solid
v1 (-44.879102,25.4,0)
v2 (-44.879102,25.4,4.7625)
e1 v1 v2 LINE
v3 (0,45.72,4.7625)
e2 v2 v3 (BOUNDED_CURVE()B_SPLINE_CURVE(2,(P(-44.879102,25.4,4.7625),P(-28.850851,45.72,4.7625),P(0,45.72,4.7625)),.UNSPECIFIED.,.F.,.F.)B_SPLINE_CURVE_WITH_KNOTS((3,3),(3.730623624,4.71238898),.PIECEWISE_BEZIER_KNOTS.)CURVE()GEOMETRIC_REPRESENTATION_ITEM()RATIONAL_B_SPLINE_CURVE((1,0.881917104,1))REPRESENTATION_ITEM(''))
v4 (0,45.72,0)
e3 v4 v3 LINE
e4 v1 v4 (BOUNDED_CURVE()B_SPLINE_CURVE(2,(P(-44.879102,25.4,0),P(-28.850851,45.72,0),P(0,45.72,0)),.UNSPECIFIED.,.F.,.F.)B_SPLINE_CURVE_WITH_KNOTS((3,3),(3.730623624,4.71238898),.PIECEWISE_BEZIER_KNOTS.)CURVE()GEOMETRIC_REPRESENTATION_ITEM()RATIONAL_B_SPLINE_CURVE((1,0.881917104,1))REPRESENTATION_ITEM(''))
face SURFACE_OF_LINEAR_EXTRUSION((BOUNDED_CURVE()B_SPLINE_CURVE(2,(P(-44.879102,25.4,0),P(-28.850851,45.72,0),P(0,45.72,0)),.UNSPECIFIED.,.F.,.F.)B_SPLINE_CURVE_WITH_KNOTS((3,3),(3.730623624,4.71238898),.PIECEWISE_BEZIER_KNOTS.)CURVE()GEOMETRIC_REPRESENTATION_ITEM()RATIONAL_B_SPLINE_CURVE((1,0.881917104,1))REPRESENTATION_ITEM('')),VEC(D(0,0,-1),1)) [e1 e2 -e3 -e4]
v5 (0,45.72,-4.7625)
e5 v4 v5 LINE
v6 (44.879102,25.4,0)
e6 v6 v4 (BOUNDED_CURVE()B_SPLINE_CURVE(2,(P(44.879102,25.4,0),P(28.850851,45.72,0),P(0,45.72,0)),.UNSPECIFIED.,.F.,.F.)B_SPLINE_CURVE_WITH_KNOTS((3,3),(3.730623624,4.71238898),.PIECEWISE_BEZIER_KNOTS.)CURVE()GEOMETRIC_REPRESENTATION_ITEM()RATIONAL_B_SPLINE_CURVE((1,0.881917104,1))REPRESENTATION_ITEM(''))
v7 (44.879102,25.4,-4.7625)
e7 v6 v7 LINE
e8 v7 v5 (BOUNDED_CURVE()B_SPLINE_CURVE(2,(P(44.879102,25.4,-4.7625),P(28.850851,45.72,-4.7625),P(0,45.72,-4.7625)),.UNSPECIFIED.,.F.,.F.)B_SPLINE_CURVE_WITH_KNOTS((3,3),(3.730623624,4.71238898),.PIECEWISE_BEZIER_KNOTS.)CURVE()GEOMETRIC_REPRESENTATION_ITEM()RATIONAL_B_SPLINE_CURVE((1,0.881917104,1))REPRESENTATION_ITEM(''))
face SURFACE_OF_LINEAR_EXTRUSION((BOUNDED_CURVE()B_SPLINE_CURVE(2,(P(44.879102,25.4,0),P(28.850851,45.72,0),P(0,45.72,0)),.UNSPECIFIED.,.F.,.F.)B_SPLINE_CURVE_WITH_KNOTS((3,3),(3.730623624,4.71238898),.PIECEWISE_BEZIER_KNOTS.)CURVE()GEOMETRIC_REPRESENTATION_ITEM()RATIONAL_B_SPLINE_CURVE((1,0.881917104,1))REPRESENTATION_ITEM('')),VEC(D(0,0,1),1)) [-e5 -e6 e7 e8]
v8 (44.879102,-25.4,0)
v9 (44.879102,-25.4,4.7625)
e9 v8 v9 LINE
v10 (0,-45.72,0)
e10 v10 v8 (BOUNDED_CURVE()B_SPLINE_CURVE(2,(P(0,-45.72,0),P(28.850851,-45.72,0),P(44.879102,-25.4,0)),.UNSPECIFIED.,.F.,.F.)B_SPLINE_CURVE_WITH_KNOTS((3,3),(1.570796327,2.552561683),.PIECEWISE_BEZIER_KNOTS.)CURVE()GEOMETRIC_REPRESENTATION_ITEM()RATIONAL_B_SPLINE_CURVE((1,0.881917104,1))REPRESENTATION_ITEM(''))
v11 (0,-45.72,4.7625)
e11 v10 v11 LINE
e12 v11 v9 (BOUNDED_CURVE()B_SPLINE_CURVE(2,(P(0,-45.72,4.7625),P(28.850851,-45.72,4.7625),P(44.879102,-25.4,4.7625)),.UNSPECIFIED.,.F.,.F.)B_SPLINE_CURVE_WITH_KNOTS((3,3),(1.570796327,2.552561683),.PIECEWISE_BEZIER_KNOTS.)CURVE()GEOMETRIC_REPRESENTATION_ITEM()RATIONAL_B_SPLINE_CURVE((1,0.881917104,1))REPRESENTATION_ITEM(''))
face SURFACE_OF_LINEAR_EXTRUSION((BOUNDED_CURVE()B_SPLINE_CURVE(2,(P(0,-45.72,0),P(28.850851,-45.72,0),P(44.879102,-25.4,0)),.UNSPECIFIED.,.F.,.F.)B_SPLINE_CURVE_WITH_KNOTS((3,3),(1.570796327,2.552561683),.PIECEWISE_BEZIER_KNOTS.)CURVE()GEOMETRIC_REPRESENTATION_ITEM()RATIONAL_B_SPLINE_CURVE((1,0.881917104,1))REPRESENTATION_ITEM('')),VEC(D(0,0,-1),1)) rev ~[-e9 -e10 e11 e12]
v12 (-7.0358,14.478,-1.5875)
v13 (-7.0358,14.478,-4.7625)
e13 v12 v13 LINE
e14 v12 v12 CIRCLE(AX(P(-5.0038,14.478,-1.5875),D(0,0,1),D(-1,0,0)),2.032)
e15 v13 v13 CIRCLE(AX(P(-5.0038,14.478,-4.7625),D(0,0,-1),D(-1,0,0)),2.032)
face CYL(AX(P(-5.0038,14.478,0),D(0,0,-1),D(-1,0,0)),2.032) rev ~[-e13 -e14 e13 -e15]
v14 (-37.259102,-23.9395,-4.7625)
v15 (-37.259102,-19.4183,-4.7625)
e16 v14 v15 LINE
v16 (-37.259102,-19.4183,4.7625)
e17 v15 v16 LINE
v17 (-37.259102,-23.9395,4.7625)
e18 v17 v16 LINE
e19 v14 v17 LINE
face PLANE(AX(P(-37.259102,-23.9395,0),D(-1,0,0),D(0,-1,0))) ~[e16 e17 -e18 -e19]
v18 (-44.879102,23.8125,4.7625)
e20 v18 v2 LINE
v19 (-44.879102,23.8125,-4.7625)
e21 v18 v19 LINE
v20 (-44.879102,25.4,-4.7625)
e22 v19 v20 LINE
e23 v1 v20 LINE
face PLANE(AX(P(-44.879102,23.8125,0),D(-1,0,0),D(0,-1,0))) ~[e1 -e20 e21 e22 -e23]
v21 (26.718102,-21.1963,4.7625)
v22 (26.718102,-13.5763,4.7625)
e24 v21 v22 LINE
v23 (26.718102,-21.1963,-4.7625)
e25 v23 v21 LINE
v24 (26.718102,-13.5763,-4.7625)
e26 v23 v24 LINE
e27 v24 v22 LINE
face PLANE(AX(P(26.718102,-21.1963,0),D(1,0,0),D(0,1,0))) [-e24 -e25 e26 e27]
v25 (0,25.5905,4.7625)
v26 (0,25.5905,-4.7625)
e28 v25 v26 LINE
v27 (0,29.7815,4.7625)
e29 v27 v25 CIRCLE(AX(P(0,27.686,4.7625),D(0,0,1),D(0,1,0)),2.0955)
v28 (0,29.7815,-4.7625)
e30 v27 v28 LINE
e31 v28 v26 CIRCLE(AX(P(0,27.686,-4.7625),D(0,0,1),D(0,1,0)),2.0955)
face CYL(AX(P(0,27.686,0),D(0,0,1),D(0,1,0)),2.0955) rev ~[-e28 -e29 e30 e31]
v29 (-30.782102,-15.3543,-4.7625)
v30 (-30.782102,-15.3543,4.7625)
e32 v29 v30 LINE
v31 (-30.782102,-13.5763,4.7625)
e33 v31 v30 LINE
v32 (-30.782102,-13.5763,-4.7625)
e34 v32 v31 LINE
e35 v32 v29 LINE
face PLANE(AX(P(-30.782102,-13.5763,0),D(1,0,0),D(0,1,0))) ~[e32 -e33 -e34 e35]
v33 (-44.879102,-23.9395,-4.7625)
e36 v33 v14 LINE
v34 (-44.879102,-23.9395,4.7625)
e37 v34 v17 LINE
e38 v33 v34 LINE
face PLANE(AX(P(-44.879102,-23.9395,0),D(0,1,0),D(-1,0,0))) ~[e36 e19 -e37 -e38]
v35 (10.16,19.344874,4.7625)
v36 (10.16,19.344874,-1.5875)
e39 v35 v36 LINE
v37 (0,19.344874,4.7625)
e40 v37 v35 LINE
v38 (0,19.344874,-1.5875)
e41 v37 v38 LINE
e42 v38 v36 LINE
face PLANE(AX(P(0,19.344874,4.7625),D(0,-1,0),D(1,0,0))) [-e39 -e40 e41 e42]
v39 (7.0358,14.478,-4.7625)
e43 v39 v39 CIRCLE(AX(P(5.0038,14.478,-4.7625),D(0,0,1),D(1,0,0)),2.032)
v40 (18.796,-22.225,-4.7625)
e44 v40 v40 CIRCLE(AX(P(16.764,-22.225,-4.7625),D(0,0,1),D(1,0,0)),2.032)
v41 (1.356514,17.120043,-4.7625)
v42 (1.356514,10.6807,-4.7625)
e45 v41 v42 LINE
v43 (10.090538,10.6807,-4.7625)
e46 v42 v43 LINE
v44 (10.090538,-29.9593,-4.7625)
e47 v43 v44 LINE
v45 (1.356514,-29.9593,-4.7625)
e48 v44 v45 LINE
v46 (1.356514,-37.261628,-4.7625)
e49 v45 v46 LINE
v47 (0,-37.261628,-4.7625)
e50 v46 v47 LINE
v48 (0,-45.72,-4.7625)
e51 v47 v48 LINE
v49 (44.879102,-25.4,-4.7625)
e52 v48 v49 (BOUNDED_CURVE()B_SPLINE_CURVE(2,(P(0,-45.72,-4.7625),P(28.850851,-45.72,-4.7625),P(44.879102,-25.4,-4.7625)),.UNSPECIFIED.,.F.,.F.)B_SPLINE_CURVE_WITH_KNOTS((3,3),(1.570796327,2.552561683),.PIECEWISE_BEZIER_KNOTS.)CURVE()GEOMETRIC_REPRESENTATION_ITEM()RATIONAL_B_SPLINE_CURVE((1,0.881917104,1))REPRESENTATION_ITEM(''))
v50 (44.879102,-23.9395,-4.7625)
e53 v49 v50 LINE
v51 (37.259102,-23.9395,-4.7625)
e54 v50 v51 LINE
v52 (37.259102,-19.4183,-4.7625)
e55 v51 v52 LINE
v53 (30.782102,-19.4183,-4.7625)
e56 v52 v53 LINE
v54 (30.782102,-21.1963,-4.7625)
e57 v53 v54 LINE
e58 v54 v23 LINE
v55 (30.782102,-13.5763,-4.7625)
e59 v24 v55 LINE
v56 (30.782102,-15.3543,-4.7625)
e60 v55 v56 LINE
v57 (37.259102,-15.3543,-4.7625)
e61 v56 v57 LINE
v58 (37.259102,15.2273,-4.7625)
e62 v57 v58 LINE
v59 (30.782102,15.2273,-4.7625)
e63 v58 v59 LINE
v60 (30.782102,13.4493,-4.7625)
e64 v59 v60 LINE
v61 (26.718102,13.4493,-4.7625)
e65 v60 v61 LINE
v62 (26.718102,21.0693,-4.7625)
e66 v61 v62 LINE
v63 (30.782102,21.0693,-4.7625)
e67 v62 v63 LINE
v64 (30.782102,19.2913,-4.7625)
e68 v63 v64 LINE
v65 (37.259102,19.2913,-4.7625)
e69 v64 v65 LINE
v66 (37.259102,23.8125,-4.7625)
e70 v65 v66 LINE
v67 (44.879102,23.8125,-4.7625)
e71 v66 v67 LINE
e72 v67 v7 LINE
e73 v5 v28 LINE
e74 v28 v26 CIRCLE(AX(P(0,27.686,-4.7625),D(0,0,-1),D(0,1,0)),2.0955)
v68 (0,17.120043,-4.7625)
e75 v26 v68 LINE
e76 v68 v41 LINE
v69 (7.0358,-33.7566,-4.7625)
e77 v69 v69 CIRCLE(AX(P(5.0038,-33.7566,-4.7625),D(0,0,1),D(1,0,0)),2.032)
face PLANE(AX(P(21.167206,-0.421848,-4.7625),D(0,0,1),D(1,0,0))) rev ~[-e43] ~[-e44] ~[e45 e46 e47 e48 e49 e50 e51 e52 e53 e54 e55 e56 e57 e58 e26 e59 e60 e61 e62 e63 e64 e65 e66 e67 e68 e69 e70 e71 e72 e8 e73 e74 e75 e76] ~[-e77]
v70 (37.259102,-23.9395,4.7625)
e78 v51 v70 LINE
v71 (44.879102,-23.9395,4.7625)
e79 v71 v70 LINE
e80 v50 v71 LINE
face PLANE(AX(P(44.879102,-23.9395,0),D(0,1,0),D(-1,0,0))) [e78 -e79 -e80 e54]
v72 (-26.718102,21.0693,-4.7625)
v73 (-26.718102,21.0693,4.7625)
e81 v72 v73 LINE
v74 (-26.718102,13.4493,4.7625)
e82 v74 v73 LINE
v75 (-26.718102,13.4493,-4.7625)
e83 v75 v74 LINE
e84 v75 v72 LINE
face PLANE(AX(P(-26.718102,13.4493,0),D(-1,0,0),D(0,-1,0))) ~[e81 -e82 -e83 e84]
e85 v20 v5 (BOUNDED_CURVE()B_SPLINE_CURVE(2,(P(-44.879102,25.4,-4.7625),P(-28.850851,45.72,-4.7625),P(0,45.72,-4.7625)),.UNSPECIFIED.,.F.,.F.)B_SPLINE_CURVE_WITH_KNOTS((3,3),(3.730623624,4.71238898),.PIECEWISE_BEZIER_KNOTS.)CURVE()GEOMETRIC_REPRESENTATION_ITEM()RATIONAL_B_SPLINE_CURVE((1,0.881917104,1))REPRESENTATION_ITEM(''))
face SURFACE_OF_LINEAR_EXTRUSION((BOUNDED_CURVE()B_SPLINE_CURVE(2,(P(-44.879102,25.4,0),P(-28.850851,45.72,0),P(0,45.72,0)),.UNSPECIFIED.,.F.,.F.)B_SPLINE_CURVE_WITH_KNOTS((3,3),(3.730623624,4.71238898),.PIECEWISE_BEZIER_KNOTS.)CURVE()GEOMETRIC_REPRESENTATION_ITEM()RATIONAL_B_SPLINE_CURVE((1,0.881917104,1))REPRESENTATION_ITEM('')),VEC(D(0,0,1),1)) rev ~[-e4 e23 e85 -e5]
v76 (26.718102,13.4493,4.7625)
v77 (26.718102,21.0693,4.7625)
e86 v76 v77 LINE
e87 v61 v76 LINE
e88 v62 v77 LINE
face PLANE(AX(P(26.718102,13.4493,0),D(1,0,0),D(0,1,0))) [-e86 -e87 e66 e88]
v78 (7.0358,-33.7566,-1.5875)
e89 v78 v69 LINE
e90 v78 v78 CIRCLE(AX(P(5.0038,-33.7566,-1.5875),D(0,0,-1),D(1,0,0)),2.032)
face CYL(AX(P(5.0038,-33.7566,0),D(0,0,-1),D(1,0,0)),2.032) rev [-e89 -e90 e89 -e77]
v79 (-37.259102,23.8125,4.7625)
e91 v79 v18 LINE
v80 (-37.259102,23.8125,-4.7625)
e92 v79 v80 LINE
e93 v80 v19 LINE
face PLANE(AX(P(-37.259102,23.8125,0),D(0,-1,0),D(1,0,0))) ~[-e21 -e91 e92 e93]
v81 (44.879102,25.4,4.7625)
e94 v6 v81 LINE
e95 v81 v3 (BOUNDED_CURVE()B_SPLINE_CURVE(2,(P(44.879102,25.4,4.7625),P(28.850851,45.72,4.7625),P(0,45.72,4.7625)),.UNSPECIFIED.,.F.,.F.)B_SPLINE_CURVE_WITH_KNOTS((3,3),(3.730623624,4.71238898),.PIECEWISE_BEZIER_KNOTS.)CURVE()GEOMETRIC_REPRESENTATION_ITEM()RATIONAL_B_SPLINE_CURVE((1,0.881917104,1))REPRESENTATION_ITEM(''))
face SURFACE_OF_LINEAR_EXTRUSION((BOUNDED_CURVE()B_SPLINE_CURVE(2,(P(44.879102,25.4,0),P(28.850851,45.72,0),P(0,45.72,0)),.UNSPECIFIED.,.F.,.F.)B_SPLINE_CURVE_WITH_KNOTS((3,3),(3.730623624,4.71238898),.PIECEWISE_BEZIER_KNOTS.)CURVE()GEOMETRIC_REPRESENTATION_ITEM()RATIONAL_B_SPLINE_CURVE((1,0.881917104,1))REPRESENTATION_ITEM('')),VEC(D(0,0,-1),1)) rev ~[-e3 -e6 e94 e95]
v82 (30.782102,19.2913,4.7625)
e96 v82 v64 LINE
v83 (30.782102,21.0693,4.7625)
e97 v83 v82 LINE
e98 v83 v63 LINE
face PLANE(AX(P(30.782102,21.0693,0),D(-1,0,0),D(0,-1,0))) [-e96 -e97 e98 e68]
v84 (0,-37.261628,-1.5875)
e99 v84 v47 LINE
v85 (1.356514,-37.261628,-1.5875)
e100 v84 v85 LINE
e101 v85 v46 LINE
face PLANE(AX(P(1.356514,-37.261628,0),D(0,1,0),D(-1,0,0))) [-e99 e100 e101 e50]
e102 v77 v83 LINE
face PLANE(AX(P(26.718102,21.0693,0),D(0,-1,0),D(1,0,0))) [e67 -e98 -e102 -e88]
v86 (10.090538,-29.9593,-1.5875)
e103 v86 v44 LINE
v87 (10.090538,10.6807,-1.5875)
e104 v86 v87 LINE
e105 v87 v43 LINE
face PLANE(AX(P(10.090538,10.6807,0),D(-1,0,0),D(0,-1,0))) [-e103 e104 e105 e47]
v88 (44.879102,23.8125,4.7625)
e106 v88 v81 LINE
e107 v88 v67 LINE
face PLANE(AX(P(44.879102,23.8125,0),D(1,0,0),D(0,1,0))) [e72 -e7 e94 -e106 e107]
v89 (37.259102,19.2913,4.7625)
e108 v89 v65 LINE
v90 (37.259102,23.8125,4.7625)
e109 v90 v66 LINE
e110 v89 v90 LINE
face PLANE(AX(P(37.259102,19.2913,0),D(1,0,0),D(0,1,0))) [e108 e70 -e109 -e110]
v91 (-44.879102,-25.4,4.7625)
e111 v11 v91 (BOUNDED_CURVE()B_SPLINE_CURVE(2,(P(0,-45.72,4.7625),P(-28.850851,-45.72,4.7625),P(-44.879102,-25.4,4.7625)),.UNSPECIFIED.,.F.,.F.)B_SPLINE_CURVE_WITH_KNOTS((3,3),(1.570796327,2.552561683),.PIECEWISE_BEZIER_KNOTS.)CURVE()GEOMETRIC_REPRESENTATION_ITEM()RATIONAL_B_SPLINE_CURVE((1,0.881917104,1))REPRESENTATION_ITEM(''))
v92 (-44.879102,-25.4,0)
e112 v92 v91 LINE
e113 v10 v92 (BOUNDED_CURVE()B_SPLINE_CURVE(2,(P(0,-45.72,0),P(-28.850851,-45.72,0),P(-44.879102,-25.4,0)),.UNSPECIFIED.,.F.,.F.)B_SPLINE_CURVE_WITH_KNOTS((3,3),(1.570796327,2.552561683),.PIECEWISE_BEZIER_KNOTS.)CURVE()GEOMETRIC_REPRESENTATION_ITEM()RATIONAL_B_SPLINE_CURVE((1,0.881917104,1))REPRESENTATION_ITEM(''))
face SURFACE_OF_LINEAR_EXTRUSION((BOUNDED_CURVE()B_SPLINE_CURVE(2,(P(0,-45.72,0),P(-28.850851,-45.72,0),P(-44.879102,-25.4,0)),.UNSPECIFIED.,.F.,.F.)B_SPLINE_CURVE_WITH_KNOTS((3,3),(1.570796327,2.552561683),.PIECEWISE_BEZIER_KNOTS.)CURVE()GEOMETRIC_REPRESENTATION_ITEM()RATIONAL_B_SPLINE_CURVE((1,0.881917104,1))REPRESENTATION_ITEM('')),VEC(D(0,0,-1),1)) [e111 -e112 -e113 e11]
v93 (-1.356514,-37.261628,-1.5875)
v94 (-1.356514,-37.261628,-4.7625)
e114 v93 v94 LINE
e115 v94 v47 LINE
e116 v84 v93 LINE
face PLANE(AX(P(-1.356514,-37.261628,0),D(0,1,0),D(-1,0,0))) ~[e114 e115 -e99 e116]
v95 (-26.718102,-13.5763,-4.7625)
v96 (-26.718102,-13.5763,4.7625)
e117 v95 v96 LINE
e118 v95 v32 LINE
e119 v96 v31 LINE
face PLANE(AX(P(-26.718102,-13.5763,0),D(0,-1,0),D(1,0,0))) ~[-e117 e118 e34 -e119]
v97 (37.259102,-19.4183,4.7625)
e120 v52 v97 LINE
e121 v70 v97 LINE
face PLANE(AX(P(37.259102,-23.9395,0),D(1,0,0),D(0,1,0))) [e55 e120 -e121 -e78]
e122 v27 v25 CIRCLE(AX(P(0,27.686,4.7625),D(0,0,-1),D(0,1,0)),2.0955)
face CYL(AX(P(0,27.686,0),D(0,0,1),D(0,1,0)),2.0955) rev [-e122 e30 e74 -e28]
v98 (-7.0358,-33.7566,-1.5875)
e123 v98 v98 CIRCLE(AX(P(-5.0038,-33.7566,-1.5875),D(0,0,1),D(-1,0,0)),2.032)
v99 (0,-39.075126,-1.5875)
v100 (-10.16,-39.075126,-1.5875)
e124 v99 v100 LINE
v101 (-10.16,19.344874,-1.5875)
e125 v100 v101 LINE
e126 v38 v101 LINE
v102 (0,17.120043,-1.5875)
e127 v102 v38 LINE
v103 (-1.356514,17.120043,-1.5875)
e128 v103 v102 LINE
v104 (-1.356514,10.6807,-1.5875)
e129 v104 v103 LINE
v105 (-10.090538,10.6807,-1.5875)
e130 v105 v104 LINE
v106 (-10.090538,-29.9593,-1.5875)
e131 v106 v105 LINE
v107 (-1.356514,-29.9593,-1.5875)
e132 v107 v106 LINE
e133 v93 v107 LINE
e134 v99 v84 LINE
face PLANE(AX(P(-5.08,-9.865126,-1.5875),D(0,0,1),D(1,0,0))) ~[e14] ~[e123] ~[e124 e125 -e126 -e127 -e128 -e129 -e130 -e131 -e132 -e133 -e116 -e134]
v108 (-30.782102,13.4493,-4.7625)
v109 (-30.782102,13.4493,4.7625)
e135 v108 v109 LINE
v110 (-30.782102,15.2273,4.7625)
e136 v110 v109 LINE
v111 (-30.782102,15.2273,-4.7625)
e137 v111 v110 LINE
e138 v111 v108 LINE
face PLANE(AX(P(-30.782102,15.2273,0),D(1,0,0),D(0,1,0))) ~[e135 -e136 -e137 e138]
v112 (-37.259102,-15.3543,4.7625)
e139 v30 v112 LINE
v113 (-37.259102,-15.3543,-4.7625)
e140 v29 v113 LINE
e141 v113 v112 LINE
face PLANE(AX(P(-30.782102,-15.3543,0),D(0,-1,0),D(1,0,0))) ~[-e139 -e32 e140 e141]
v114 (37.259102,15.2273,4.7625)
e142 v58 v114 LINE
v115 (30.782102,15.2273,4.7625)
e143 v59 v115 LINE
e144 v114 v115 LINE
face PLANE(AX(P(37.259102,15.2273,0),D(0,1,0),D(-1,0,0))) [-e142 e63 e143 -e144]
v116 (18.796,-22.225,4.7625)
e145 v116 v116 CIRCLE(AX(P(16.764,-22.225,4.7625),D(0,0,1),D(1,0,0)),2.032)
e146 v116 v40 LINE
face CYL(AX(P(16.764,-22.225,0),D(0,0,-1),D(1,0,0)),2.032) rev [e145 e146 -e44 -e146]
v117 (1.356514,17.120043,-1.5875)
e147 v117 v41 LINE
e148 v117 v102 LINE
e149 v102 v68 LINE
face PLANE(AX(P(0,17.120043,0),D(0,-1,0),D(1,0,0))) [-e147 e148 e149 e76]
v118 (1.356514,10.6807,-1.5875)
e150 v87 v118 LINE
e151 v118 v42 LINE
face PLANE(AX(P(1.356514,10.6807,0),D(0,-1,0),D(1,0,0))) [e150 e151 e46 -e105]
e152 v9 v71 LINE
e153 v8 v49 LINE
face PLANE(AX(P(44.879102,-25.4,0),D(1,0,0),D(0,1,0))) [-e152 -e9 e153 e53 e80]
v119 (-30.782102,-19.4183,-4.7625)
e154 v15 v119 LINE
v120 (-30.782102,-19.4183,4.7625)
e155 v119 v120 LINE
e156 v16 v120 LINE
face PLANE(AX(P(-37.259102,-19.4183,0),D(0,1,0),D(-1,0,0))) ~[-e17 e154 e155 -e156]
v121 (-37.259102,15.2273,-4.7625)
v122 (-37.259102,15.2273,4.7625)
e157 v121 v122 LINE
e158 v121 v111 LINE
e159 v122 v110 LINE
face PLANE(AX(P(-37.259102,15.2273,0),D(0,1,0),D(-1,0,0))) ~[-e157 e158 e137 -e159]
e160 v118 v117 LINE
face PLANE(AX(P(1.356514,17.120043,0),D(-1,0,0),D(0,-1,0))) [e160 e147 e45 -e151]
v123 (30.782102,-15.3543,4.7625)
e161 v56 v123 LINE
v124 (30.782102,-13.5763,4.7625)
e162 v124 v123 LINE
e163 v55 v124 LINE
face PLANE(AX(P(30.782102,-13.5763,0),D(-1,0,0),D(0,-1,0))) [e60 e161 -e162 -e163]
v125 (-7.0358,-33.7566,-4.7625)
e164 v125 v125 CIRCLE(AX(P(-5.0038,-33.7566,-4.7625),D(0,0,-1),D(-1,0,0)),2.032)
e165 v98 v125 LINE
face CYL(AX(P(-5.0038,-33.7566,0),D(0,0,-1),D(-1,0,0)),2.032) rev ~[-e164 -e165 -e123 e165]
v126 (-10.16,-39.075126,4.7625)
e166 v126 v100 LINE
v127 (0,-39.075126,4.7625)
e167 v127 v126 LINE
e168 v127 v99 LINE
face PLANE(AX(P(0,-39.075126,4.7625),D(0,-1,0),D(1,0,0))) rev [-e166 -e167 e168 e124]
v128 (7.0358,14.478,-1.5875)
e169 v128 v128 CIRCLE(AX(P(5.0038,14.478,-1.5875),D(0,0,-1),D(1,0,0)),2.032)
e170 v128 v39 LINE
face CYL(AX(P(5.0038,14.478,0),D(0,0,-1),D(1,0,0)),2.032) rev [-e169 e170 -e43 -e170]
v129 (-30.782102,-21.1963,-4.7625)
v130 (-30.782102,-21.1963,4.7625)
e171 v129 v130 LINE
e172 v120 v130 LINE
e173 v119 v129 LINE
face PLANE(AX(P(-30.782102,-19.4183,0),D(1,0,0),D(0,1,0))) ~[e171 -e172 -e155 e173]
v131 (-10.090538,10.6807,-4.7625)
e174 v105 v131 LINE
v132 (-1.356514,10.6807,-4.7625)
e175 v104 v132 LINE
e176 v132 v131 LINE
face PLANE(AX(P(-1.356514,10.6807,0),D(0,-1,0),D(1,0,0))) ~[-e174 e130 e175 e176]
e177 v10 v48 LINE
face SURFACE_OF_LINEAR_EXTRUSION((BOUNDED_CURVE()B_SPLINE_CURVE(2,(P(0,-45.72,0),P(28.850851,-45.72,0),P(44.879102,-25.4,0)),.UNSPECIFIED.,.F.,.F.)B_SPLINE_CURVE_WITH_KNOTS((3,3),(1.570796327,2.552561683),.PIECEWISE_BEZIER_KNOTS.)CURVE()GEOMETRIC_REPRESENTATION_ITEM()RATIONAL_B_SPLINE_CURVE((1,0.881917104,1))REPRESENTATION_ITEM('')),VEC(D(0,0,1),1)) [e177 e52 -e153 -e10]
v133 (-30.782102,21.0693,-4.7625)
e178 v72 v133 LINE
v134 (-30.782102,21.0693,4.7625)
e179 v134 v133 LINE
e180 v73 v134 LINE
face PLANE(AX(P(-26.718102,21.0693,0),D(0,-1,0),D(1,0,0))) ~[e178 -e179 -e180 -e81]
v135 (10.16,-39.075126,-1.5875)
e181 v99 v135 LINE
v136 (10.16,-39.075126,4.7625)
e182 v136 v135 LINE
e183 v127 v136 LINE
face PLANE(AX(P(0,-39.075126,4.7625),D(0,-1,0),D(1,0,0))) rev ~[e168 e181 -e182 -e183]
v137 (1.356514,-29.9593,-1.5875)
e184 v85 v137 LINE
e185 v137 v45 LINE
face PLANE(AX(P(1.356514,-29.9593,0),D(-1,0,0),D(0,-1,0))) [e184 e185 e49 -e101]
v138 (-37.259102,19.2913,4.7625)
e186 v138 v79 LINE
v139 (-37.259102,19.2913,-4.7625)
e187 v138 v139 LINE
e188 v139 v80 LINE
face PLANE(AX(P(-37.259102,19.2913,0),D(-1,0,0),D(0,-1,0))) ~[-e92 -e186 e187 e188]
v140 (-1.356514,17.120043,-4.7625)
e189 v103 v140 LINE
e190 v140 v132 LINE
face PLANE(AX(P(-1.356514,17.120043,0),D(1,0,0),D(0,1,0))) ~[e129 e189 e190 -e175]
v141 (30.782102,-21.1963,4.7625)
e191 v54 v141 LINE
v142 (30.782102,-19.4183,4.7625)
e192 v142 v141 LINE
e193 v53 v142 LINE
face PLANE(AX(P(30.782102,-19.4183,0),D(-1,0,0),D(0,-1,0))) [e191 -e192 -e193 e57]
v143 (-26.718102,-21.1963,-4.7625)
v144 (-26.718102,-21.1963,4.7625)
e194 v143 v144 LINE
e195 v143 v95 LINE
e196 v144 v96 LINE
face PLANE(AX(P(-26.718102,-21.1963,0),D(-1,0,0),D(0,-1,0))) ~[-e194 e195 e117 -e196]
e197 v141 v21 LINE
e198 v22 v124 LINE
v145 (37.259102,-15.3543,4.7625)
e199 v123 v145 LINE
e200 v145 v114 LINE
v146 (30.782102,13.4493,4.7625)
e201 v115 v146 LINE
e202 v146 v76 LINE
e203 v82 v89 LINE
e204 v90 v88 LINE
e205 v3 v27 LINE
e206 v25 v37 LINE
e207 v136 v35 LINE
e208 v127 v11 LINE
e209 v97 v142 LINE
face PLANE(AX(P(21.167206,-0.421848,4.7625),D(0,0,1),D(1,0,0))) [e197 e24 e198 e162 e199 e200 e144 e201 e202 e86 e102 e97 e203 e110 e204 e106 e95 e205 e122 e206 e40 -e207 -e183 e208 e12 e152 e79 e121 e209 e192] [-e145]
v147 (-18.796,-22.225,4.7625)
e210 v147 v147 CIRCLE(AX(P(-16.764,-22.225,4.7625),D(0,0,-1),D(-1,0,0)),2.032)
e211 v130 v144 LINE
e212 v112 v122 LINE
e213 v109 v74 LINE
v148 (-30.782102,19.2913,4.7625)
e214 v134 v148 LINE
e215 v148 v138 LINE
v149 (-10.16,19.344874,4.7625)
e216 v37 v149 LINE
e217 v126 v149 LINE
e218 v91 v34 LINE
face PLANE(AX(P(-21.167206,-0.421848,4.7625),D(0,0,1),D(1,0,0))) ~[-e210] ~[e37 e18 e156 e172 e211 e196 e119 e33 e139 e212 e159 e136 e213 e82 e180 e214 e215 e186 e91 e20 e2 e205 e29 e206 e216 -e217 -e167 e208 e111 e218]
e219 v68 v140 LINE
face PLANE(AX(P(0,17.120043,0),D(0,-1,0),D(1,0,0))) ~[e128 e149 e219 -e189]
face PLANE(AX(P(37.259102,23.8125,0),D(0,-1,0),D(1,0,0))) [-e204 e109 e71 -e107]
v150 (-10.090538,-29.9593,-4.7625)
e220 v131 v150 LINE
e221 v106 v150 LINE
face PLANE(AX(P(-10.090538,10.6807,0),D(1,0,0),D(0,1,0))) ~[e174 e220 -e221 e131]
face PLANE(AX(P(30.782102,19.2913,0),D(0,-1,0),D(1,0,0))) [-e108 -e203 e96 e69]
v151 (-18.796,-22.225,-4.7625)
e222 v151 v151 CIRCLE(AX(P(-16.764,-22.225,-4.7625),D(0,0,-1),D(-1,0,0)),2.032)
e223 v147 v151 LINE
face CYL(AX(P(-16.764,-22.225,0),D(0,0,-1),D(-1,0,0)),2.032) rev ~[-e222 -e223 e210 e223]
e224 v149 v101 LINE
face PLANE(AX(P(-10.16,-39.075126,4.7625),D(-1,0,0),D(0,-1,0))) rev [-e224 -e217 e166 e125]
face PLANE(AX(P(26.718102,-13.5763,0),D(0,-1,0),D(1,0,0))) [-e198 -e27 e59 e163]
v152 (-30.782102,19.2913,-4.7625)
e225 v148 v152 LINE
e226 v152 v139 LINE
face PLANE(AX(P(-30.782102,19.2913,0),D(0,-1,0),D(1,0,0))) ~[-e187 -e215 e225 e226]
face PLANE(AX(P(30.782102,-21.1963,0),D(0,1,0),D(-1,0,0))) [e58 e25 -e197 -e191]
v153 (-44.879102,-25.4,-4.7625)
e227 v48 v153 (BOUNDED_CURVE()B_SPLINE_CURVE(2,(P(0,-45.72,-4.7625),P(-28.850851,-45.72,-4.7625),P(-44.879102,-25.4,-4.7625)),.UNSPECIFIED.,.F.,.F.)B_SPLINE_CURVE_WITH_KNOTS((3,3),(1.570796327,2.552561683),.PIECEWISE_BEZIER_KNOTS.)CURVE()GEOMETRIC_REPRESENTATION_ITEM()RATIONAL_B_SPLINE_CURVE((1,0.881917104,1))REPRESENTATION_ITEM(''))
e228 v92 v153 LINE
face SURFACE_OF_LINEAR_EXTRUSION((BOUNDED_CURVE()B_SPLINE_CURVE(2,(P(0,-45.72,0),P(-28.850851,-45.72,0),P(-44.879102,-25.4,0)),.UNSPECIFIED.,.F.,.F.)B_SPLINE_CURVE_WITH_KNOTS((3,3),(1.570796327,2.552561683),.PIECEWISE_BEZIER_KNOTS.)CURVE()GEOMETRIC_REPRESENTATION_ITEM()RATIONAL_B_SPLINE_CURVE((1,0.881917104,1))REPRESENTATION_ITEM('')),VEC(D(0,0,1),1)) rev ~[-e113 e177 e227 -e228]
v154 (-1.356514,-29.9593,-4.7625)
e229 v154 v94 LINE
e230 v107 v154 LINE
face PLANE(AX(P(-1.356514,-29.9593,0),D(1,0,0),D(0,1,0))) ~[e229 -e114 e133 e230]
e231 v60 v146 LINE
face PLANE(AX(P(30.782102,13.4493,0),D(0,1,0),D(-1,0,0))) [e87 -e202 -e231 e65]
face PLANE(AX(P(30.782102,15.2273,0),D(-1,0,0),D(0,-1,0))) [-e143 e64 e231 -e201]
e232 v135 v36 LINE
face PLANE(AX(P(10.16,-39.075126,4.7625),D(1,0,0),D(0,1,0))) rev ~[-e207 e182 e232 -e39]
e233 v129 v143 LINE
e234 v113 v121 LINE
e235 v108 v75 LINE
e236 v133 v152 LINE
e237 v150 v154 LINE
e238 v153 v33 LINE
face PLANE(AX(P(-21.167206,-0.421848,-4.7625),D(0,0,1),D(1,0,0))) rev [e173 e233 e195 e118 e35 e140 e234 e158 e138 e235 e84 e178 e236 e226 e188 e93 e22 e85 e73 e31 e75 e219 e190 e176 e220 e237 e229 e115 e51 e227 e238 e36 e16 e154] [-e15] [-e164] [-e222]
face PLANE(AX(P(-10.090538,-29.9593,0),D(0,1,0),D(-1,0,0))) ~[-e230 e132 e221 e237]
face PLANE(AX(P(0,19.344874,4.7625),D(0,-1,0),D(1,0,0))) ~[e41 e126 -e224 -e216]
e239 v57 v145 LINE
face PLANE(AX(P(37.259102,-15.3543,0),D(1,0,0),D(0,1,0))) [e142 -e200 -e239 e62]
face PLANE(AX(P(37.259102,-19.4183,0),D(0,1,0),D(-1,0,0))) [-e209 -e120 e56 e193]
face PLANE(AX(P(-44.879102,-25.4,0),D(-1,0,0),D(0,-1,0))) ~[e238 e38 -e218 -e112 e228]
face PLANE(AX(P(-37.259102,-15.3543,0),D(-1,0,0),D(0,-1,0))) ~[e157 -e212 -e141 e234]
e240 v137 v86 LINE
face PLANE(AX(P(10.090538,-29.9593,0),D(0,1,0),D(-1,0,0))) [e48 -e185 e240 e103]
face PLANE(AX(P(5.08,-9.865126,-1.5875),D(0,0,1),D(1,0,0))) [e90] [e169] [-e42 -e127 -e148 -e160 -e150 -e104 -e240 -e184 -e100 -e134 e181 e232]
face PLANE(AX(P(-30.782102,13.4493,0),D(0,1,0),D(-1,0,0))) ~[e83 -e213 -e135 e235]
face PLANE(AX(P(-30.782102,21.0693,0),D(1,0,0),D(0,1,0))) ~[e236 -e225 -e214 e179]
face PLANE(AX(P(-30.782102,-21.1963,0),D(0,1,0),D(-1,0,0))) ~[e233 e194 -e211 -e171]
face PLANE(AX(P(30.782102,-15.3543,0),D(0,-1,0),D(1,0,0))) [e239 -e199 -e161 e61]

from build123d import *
from build123d import SkipClean  # not in build123d's __all__

# Parameters (mm, degrees)
F0_R     = 2.032
F1_DEPTH = 4.7625
F2_W     = 10.16
F2_H     = 58.42
F3_DEPTH = 6.35


with BuildPart() as f1:
    # F0 (on Top) → F1 (new body, symmetric)
    with BuildSketch(Plane.XY):
        with BuildLine():
            Line((0, -37.2616276145), (0, -45.72))
            add(Edge.make_bspline(
                [(0, -45.72), (28.8508510644, -45.72), (44.8791016558, -25.4)],
                knots=[1.5707963268, 1.5707963268, 1.5707963268, 2.5525616834, 2.5525616834, 2.5525616834], degree=2, weights=[1, 0.8819171037, 1]))
            Line((44.8791016558, -25.4), (44.8791016558, -23.9395))
            Line((44.8791016558, -23.9395), (37.2591016558, -23.9395))
            Line((37.2591016558, -23.9395), (37.2591016558, -19.4183))
            Line((37.2591016558, -19.4183), (30.7821016558, -19.4183))
            Line((30.7821016558, -19.4183), (30.7821016558, -21.1963))
            Line((30.7821016558, -21.1963), (26.7181016558, -21.1963))
            Line((26.7181016558, -21.1963), (26.7181016558, -13.5763))
            Line((26.7181016558, -13.5763), (30.7821016558, -13.5763))
            Line((30.7821016558, -13.5763), (30.7821016558, -15.3543))
            Line((30.7821016558, -15.3543), (37.2591016558, -15.3543))
            Line((37.2591016558, -15.3543), (37.2591016558, 15.2273))
            Line((37.2591016558, 15.2273), (30.7821016558, 15.2273))
            Line((30.7821016558, 15.2273), (30.7821016558, 13.4493))
            Line((30.7821016558, 13.4493), (26.7181016558, 13.4493))
            Line((26.7181016558, 13.4493), (26.7181016558, 21.0693))
            Line((26.7181016558, 21.0693), (30.7821016558, 21.0693))
            Line((30.7821016558, 21.0693), (30.7821016558, 19.2913))
            Line((30.7821016558, 19.2913), (37.2591016558, 19.2913))
            Line((37.2591016558, 19.2913), (37.2591016558, 23.8125))
            Line((37.2591016558, 23.8125), (44.8791016558, 23.8125))
            Line((44.8791016558, 23.8125), (44.8791016558, 25.4))
            add(Edge.make_bspline(
                [(44.8791016558, 25.4), (28.8508510644, 45.72), (0, 45.72)],
                knots=[3.7306236238, 3.7306236238, 3.7306236238, 4.7123889804, 4.7123889804, 4.7123889804], degree=2, weights=[1, 0.8819171037, 1]))
            Line((0, 45.72), (0, 29.7815))
            ThreePointArc((0, 29.7815), (2.0955, 27.686), (0, 25.5905))
            Line((0, 25.5905), (0, 17.1200428158))
            Line((0, 17.1200428158), (1.3565140544, 17.1200428158))
            Line((1.3565140544, 17.1200428158), (1.3565140544, 10.6807))
            Line((1.3565140544, 10.6807), (10.0905383006, 10.6807))
            Line((10.0905383006, 10.6807), (10.0905383006, -29.9593))
            Line((10.0905383006, -29.9593), (1.3565140544, -29.9593))
            Line((1.3565140544, -29.9593), (1.3565140544, -37.2616276145))
            Line((1.3565140544, -37.2616276145), (0, -37.2616276145))
        make_face()
        with Locations((5.0038, -33.7566)):
            Circle(F0_R, mode=Mode.SUBTRACT)
        with Locations((16.764, -22.225)):
            Circle(F0_R, mode=Mode.SUBTRACT)
        with Locations((5.0038, 14.478)):
            Circle(F0_R, mode=Mode.SUBTRACT)
    extrude(amount=F1_DEPTH, both=True)

    # F2 (on face) → F3 (cut)
    with BuildSketch(Plane.XY.offset(4.7625)):
        with Locations((5.08, -9.8651262736)):
            Rectangle(F2_W, F2_H)
    extrude(amount=-F3_DEPTH, mode=Mode.SUBTRACT)

    # F4: F1 across plane


with BuildPart() as f1_1:
    add(f1.part, clean=False)
    with SkipClean():  # cleaning this boolean's faces spoils the solid; the shape is the same uncleaned
        add(f1.part.mirror(Plane.YZ), clean=False)


solid = f1_1.part
